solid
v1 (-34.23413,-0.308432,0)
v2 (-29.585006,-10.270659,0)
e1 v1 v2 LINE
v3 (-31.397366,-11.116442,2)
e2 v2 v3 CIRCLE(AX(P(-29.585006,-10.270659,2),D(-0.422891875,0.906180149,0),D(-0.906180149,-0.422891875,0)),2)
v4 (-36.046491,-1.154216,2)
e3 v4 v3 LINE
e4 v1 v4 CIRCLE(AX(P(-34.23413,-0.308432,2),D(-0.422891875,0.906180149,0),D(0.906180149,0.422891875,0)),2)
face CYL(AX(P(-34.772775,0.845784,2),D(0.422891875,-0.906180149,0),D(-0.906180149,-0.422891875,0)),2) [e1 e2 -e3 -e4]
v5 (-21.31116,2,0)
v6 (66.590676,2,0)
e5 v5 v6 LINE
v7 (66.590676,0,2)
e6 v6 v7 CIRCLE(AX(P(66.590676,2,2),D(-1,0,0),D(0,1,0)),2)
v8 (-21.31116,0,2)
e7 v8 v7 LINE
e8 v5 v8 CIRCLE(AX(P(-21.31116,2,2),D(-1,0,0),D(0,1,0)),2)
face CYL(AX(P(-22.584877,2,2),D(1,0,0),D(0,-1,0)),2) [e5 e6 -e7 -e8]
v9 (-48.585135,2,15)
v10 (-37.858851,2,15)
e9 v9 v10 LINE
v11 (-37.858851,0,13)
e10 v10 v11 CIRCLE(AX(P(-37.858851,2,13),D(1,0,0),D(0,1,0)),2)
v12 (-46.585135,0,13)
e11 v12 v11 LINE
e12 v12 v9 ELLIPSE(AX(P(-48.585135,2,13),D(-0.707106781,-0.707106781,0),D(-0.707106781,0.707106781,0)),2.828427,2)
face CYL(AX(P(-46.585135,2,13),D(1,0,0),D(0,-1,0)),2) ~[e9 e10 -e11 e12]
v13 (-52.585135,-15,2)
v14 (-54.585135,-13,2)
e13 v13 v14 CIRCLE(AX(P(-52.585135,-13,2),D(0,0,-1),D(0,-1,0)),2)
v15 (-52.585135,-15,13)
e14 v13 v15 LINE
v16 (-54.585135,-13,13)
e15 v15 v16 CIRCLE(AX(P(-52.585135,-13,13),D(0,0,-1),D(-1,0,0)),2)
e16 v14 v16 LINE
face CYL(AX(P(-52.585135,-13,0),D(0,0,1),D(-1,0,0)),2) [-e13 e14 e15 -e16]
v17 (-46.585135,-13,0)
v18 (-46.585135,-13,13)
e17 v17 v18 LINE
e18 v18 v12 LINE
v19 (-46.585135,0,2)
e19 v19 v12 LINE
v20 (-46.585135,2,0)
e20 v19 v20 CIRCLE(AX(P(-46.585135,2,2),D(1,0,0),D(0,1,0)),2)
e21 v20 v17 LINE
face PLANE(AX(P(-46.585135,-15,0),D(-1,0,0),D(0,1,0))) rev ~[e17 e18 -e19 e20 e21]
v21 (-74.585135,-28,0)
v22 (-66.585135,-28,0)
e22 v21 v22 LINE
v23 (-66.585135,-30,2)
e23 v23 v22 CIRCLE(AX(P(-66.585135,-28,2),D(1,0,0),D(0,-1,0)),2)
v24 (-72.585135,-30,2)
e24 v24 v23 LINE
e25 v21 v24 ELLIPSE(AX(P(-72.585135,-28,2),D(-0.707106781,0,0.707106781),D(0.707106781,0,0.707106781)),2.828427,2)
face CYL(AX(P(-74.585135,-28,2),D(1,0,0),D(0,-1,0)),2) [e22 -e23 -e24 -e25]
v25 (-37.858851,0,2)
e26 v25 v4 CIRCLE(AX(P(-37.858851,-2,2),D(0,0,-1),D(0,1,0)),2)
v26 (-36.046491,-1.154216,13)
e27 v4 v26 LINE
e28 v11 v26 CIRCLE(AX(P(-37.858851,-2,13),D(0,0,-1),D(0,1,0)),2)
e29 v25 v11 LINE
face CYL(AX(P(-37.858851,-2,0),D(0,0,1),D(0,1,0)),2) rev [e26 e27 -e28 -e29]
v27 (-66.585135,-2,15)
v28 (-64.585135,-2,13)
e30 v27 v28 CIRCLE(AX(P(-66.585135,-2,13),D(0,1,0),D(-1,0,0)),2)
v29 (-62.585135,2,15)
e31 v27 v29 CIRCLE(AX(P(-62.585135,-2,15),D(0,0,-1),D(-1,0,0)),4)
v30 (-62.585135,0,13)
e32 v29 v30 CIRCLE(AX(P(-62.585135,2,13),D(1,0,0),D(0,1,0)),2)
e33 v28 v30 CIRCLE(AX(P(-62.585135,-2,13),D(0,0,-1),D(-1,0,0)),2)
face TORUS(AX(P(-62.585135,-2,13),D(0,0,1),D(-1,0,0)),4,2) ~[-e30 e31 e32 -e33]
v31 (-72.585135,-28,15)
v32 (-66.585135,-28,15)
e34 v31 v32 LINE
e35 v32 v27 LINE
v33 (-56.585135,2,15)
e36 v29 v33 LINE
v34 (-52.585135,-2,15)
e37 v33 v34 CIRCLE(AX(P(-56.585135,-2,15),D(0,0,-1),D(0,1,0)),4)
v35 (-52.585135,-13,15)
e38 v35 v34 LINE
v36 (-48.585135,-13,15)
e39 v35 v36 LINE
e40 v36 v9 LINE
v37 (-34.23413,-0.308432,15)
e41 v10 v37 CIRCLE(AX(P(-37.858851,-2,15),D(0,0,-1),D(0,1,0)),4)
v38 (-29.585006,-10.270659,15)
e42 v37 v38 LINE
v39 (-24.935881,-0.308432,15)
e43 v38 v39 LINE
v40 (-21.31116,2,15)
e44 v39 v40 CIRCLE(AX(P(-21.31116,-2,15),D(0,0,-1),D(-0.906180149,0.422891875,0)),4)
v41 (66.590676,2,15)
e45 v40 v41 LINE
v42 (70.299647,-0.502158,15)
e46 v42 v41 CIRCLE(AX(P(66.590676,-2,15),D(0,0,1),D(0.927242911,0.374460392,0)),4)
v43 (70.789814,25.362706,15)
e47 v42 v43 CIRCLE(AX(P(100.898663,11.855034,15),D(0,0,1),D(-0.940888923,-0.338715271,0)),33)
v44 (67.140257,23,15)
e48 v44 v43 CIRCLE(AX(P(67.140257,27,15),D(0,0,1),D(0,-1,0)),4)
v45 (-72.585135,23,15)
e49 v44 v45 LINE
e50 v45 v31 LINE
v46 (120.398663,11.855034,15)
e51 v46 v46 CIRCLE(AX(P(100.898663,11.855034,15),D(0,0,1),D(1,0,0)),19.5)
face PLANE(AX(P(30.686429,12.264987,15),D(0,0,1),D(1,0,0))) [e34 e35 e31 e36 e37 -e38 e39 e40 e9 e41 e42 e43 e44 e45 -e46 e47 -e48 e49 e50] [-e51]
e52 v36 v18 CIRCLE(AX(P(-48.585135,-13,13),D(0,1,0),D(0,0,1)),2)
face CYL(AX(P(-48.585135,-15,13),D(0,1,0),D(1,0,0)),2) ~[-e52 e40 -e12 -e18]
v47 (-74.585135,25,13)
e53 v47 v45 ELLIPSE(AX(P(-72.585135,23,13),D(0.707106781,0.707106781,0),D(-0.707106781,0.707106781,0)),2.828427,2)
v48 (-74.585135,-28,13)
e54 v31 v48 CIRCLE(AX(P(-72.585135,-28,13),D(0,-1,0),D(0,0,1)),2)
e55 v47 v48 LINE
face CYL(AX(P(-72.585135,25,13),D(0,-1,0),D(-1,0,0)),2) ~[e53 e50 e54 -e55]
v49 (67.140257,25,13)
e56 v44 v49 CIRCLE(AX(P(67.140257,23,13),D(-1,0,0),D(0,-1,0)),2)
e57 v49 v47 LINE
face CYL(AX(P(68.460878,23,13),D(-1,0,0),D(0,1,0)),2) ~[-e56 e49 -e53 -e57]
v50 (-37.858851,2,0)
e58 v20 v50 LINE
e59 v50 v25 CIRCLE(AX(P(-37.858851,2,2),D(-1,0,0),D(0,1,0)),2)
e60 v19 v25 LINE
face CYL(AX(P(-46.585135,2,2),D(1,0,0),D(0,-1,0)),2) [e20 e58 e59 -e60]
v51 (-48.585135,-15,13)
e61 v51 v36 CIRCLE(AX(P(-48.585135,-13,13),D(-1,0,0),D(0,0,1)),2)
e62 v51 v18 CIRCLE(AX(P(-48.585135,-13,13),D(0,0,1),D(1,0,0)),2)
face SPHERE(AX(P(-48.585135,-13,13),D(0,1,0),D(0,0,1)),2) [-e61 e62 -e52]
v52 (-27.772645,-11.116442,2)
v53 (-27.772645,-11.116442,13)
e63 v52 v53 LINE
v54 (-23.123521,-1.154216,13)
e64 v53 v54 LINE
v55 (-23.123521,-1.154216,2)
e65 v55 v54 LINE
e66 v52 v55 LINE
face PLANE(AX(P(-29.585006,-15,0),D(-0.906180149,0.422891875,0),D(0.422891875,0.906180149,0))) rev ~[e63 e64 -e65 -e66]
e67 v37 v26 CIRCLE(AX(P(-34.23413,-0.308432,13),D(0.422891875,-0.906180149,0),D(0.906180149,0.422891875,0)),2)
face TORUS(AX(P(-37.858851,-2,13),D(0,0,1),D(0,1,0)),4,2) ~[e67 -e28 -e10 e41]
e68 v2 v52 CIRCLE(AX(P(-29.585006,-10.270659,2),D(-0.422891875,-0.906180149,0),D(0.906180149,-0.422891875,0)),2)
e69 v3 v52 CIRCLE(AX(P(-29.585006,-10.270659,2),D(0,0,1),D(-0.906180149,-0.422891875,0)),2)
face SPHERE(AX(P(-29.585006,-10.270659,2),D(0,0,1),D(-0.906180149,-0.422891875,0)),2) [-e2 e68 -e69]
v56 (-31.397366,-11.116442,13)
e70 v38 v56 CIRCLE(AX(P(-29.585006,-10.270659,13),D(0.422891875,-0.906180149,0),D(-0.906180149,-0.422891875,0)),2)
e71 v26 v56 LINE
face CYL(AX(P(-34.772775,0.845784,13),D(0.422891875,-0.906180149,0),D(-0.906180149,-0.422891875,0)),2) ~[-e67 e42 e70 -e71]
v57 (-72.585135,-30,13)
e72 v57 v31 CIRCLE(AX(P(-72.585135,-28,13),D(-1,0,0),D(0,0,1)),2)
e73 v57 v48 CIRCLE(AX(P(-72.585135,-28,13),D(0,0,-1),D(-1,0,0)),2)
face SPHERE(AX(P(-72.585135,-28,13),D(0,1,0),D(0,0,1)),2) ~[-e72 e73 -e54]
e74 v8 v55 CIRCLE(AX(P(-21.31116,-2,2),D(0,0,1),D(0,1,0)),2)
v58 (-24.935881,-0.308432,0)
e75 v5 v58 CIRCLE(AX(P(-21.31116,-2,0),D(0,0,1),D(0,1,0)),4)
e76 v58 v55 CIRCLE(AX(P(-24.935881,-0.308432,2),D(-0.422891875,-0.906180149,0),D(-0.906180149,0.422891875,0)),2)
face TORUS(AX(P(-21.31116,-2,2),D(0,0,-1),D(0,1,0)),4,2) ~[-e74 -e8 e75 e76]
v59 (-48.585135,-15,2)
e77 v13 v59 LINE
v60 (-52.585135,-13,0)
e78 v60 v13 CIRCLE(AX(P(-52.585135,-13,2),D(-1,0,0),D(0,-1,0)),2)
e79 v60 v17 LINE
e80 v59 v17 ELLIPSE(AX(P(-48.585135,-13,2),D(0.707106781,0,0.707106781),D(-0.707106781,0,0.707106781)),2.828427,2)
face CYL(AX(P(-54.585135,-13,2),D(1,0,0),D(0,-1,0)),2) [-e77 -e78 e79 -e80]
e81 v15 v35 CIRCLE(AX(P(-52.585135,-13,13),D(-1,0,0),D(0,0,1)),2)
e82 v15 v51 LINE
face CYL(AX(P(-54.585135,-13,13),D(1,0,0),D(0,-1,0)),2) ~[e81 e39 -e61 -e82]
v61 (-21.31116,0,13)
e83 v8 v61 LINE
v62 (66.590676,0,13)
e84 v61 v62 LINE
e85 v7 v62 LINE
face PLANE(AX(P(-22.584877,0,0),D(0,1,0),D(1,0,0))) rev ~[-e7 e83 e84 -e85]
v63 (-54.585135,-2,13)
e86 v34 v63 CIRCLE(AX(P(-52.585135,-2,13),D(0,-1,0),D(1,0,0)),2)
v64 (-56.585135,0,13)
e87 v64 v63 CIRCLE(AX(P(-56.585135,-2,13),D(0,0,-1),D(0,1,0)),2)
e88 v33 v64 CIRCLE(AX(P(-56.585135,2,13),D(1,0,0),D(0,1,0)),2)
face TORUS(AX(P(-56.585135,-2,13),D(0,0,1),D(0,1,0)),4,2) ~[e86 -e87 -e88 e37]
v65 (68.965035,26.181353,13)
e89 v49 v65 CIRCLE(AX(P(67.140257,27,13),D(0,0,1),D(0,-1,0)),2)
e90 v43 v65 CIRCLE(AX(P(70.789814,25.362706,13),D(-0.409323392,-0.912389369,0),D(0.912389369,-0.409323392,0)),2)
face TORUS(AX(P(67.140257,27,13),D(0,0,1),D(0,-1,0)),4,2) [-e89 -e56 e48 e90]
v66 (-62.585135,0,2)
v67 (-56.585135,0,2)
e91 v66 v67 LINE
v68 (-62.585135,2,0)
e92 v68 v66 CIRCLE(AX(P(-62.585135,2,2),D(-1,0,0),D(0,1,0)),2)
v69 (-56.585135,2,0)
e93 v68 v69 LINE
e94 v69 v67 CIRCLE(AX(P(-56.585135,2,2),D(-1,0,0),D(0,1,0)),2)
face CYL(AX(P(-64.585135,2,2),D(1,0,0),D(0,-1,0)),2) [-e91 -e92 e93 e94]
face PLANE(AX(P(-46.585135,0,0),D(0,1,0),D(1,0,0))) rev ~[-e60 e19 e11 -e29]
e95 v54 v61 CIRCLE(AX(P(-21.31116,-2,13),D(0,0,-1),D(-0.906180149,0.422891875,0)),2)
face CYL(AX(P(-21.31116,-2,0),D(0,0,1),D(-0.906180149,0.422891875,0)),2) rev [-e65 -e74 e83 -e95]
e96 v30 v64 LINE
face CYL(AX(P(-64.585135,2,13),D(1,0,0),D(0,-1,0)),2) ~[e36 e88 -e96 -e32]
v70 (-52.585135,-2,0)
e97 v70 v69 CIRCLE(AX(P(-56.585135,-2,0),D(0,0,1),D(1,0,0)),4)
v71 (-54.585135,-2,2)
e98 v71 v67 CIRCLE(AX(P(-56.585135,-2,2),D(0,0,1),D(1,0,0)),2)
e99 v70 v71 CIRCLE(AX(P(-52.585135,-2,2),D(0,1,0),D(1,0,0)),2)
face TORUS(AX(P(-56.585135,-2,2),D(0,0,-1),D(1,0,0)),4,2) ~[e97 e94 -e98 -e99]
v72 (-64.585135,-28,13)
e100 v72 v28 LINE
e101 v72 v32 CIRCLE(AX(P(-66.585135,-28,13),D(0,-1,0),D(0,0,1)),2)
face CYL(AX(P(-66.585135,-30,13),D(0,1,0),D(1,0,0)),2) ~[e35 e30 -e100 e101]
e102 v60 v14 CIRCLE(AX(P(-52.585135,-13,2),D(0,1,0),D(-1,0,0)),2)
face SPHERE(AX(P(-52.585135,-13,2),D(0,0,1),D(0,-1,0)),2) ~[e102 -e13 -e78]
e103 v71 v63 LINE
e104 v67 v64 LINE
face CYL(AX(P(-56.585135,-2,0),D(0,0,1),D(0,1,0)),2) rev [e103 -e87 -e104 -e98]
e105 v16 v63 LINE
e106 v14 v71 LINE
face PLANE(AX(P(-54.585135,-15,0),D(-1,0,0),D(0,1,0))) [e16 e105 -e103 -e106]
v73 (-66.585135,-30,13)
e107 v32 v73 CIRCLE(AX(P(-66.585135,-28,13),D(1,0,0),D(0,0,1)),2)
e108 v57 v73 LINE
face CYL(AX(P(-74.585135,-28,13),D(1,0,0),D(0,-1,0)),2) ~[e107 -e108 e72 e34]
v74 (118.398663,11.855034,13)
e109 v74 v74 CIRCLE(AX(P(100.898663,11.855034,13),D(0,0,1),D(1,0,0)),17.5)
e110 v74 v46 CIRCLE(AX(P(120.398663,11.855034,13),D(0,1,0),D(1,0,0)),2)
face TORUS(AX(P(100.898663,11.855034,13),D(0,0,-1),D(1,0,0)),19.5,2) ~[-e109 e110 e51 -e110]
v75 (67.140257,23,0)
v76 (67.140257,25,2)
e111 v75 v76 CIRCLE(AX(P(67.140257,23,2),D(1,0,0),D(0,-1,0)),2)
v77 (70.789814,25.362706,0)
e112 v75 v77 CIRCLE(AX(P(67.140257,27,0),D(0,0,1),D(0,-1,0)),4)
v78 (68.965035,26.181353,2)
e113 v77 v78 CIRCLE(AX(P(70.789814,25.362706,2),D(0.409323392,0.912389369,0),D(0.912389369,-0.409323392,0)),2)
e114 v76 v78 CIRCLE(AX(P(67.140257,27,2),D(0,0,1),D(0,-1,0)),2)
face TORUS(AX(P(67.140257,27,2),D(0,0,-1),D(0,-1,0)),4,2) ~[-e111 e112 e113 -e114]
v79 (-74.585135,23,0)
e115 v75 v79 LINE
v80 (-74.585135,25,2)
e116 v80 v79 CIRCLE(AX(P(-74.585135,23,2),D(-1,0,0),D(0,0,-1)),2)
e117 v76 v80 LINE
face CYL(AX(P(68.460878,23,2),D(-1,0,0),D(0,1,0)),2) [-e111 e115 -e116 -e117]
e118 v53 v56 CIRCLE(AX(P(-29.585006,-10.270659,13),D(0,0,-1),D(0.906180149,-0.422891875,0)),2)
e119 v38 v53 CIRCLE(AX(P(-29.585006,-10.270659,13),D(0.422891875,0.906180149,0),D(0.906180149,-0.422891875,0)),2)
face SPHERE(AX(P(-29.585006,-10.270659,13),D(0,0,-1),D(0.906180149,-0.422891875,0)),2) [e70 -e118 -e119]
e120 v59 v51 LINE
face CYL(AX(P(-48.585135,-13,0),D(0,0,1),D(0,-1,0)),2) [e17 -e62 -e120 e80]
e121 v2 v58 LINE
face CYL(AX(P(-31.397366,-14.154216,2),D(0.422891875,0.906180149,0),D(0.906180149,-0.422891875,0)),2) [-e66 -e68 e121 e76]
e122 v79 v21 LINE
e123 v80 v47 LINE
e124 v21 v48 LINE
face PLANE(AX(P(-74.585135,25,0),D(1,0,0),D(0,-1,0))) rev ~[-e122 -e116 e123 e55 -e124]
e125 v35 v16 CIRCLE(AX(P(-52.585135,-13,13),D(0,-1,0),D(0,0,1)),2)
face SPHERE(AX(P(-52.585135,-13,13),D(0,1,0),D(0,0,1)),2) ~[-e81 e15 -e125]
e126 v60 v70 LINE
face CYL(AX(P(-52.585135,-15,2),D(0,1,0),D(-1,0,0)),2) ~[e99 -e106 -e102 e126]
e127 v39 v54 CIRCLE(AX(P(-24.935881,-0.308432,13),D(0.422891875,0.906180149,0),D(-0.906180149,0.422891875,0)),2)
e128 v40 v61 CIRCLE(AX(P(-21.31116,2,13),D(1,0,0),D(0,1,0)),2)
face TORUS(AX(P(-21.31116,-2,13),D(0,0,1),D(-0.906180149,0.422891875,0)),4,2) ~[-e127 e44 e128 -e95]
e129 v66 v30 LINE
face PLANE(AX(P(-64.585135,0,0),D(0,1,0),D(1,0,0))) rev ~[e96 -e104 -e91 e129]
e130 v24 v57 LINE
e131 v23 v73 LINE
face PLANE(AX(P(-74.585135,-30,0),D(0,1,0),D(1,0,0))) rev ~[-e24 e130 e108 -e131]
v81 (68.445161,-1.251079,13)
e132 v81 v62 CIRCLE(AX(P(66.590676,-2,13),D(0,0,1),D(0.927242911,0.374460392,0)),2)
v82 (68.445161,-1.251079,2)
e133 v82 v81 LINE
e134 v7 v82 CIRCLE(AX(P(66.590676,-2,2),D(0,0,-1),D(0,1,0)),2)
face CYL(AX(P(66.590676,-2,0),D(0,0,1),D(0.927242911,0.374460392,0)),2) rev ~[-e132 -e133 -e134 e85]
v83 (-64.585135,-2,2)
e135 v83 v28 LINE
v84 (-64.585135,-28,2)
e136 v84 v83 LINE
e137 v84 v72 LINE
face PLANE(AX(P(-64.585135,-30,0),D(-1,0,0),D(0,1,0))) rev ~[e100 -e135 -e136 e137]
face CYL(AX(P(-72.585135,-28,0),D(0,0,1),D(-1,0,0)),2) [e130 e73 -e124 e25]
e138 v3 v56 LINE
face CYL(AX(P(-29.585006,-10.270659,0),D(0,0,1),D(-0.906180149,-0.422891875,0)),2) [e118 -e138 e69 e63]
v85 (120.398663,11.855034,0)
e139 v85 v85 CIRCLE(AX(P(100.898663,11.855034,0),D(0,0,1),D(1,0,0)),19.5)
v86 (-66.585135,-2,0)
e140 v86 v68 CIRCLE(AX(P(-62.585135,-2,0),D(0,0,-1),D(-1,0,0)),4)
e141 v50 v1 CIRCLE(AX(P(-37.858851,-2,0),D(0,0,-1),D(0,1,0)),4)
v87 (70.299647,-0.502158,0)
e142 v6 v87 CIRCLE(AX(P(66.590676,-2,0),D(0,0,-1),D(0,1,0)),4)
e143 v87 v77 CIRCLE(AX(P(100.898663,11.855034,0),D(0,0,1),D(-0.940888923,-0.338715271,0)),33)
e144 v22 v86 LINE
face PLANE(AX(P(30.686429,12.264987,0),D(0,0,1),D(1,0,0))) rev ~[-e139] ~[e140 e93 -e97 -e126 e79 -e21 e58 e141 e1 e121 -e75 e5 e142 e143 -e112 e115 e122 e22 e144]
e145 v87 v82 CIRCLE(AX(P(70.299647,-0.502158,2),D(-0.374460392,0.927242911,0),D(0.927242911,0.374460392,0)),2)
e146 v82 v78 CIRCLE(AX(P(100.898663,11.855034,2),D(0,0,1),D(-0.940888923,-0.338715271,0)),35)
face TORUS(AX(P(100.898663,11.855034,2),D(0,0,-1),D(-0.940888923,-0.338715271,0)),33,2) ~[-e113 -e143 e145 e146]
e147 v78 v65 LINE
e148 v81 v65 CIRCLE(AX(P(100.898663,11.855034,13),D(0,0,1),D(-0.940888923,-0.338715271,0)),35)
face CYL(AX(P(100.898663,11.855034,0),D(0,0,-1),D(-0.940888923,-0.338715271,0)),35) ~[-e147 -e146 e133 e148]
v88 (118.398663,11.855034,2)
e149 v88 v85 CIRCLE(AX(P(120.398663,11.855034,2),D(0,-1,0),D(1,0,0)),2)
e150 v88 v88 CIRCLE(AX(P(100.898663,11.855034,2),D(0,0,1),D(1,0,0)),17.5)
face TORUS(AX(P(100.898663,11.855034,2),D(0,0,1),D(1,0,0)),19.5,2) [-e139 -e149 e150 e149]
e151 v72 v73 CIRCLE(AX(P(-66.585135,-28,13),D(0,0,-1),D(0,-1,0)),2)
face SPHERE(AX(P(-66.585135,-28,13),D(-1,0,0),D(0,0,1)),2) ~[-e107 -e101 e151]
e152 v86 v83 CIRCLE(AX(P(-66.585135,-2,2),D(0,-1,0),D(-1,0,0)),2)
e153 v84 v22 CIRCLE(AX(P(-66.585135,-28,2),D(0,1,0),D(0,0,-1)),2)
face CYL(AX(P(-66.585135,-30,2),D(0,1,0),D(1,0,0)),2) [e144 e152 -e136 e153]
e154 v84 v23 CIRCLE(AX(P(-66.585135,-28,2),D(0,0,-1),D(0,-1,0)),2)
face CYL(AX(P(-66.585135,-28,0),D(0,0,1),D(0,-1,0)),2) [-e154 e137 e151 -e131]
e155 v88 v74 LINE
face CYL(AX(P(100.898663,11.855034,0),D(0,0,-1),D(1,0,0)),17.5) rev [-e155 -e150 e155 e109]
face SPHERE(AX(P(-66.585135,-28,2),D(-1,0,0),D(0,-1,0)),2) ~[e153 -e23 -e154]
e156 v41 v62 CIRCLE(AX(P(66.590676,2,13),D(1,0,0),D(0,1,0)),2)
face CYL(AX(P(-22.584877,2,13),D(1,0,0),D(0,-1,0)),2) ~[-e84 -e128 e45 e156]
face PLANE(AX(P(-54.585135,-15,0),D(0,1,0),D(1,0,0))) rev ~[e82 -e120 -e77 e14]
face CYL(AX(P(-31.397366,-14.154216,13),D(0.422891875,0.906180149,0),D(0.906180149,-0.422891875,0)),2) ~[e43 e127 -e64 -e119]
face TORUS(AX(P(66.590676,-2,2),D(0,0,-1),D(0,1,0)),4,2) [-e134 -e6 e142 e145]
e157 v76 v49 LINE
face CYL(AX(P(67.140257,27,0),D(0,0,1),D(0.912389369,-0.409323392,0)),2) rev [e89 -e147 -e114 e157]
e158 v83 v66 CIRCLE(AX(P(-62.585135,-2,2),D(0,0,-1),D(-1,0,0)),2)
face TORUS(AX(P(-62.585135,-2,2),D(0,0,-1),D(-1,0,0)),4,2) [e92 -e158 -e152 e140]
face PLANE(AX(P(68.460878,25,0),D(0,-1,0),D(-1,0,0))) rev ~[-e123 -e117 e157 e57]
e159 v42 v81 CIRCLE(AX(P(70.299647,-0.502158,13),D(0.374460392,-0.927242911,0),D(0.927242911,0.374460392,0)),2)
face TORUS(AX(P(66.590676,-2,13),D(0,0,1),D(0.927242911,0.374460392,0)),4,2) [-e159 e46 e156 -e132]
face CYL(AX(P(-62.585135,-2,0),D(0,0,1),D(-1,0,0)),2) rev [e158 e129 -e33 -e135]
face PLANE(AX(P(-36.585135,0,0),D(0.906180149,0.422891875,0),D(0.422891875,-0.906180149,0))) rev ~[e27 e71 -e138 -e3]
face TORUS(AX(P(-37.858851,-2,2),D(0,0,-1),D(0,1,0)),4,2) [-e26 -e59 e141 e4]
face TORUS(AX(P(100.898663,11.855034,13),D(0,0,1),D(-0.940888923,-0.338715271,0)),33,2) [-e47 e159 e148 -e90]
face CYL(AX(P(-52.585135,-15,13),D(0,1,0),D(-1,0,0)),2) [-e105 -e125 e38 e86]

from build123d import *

# Parameters (mm, degrees)
F0_R     = 17.5
F0_W     = 8
F0_H     = 15
F0_W_2   = 10
F0_H_2   = 30
F1_DEPTH = 15
F2_R     = 2


with BuildPart() as f1:
    # F0 (on Top) → F1 (new body)
    with BuildSketch(Plane.XY):
        with BuildLine():
            ThreePointArc((67.9675509022, 0), (135.8918507742, 11.1645103967), (68.4608784178, 25))
            Line((68.4608784178, 25), (-74.5851349286, 25))
            Line((-74.5851349286, 25), (-74.5851349286, 0))
            Line((-74.5851349286, 0), (-64.5851349286, 0))
            Line((-64.5851349286, 0), (-54.5851349286, 0))
            Line((-54.5851349286, 0), (-46.5851349286, 0))
            Line((-46.5851349286, 0), (-36.5851349286, 0))
            Line((-36.5851349286, 0), (-22.5848765024, 0))
            Line((-22.5848765024, 0), (67.9675509022, 0))
        make_face()
        with Locations((100.8986632018, 11.8550344882)):
            Circle(F0_R, mode=Mode.SUBTRACT)
        Polygon((-29.5850057155, -15), (-22.5848765024, 0), (-36.5851349286, 0), align=None)
        with Locations((-50.5851349286, -7.5)):
            Rectangle(F0_W, F0_H)
        with Locations((-69.5851349286, -15)):
            Rectangle(F0_W_2, F0_H_2)
    extrude(amount=F1_DEPTH)

    # F2
    f2_edges = [f1.edges().sort_by_distance(p)[0] for p in [
        (-3.062128, 25, 15),
        (135.891851, 11.16451, 15),
        (-26.084941, -7.5, 15),
        (-46.585135, -7.5, 15),
        (-74.585135, -2.5, 15),
        (-69.585135, -30, 15),
        (-64.585135, -15, 15),
        (-59.585135, 0, 15),
        (-54.585135, -7.5, 15),
        (-50.585135, -15, 15),
        (-41.585135, 0, 15),
        (-33.08507, -7.5, 15),
        (22.691337, 0, 15),
        (83.398663, 11.855034, 15),
        (-46.585135, -15, 7.5),
        (-41.585135, 0, 0),
        (-33.08507, -7.5, 0),
        (22.691337, 0, 0),
        (-74.585135, -30, 7.5),
        (-54.585135, -15, 7.5),
        (-59.585135, 0, 0),
        (83.398663, 11.855034, 0),
        (-3.062128, 25, 0),
        (-26.084941, -7.5, 0),
        (-50.585135, -15, 0),
        (-69.585135, -30, 0),
        (135.891851, 11.16451, 0),
        (-29.585006, -15, 7.5),
        (-22.584877, 0, 7.5),
        (-64.585135, -30, 7.5),
        (-64.585135, 0, 7.5),
        (-64.585135, -15, 0),
        (-36.585135, 0, 7.5),
        (-54.585135, 0, 7.5),
        (68.460878, 25, 7.5),
        (67.967551, 0, 7.5),
        (-54.585135, -7.5, 0),
    ]]
    fillet(f2_edges, radius=F2_R)


solid = f1.part
